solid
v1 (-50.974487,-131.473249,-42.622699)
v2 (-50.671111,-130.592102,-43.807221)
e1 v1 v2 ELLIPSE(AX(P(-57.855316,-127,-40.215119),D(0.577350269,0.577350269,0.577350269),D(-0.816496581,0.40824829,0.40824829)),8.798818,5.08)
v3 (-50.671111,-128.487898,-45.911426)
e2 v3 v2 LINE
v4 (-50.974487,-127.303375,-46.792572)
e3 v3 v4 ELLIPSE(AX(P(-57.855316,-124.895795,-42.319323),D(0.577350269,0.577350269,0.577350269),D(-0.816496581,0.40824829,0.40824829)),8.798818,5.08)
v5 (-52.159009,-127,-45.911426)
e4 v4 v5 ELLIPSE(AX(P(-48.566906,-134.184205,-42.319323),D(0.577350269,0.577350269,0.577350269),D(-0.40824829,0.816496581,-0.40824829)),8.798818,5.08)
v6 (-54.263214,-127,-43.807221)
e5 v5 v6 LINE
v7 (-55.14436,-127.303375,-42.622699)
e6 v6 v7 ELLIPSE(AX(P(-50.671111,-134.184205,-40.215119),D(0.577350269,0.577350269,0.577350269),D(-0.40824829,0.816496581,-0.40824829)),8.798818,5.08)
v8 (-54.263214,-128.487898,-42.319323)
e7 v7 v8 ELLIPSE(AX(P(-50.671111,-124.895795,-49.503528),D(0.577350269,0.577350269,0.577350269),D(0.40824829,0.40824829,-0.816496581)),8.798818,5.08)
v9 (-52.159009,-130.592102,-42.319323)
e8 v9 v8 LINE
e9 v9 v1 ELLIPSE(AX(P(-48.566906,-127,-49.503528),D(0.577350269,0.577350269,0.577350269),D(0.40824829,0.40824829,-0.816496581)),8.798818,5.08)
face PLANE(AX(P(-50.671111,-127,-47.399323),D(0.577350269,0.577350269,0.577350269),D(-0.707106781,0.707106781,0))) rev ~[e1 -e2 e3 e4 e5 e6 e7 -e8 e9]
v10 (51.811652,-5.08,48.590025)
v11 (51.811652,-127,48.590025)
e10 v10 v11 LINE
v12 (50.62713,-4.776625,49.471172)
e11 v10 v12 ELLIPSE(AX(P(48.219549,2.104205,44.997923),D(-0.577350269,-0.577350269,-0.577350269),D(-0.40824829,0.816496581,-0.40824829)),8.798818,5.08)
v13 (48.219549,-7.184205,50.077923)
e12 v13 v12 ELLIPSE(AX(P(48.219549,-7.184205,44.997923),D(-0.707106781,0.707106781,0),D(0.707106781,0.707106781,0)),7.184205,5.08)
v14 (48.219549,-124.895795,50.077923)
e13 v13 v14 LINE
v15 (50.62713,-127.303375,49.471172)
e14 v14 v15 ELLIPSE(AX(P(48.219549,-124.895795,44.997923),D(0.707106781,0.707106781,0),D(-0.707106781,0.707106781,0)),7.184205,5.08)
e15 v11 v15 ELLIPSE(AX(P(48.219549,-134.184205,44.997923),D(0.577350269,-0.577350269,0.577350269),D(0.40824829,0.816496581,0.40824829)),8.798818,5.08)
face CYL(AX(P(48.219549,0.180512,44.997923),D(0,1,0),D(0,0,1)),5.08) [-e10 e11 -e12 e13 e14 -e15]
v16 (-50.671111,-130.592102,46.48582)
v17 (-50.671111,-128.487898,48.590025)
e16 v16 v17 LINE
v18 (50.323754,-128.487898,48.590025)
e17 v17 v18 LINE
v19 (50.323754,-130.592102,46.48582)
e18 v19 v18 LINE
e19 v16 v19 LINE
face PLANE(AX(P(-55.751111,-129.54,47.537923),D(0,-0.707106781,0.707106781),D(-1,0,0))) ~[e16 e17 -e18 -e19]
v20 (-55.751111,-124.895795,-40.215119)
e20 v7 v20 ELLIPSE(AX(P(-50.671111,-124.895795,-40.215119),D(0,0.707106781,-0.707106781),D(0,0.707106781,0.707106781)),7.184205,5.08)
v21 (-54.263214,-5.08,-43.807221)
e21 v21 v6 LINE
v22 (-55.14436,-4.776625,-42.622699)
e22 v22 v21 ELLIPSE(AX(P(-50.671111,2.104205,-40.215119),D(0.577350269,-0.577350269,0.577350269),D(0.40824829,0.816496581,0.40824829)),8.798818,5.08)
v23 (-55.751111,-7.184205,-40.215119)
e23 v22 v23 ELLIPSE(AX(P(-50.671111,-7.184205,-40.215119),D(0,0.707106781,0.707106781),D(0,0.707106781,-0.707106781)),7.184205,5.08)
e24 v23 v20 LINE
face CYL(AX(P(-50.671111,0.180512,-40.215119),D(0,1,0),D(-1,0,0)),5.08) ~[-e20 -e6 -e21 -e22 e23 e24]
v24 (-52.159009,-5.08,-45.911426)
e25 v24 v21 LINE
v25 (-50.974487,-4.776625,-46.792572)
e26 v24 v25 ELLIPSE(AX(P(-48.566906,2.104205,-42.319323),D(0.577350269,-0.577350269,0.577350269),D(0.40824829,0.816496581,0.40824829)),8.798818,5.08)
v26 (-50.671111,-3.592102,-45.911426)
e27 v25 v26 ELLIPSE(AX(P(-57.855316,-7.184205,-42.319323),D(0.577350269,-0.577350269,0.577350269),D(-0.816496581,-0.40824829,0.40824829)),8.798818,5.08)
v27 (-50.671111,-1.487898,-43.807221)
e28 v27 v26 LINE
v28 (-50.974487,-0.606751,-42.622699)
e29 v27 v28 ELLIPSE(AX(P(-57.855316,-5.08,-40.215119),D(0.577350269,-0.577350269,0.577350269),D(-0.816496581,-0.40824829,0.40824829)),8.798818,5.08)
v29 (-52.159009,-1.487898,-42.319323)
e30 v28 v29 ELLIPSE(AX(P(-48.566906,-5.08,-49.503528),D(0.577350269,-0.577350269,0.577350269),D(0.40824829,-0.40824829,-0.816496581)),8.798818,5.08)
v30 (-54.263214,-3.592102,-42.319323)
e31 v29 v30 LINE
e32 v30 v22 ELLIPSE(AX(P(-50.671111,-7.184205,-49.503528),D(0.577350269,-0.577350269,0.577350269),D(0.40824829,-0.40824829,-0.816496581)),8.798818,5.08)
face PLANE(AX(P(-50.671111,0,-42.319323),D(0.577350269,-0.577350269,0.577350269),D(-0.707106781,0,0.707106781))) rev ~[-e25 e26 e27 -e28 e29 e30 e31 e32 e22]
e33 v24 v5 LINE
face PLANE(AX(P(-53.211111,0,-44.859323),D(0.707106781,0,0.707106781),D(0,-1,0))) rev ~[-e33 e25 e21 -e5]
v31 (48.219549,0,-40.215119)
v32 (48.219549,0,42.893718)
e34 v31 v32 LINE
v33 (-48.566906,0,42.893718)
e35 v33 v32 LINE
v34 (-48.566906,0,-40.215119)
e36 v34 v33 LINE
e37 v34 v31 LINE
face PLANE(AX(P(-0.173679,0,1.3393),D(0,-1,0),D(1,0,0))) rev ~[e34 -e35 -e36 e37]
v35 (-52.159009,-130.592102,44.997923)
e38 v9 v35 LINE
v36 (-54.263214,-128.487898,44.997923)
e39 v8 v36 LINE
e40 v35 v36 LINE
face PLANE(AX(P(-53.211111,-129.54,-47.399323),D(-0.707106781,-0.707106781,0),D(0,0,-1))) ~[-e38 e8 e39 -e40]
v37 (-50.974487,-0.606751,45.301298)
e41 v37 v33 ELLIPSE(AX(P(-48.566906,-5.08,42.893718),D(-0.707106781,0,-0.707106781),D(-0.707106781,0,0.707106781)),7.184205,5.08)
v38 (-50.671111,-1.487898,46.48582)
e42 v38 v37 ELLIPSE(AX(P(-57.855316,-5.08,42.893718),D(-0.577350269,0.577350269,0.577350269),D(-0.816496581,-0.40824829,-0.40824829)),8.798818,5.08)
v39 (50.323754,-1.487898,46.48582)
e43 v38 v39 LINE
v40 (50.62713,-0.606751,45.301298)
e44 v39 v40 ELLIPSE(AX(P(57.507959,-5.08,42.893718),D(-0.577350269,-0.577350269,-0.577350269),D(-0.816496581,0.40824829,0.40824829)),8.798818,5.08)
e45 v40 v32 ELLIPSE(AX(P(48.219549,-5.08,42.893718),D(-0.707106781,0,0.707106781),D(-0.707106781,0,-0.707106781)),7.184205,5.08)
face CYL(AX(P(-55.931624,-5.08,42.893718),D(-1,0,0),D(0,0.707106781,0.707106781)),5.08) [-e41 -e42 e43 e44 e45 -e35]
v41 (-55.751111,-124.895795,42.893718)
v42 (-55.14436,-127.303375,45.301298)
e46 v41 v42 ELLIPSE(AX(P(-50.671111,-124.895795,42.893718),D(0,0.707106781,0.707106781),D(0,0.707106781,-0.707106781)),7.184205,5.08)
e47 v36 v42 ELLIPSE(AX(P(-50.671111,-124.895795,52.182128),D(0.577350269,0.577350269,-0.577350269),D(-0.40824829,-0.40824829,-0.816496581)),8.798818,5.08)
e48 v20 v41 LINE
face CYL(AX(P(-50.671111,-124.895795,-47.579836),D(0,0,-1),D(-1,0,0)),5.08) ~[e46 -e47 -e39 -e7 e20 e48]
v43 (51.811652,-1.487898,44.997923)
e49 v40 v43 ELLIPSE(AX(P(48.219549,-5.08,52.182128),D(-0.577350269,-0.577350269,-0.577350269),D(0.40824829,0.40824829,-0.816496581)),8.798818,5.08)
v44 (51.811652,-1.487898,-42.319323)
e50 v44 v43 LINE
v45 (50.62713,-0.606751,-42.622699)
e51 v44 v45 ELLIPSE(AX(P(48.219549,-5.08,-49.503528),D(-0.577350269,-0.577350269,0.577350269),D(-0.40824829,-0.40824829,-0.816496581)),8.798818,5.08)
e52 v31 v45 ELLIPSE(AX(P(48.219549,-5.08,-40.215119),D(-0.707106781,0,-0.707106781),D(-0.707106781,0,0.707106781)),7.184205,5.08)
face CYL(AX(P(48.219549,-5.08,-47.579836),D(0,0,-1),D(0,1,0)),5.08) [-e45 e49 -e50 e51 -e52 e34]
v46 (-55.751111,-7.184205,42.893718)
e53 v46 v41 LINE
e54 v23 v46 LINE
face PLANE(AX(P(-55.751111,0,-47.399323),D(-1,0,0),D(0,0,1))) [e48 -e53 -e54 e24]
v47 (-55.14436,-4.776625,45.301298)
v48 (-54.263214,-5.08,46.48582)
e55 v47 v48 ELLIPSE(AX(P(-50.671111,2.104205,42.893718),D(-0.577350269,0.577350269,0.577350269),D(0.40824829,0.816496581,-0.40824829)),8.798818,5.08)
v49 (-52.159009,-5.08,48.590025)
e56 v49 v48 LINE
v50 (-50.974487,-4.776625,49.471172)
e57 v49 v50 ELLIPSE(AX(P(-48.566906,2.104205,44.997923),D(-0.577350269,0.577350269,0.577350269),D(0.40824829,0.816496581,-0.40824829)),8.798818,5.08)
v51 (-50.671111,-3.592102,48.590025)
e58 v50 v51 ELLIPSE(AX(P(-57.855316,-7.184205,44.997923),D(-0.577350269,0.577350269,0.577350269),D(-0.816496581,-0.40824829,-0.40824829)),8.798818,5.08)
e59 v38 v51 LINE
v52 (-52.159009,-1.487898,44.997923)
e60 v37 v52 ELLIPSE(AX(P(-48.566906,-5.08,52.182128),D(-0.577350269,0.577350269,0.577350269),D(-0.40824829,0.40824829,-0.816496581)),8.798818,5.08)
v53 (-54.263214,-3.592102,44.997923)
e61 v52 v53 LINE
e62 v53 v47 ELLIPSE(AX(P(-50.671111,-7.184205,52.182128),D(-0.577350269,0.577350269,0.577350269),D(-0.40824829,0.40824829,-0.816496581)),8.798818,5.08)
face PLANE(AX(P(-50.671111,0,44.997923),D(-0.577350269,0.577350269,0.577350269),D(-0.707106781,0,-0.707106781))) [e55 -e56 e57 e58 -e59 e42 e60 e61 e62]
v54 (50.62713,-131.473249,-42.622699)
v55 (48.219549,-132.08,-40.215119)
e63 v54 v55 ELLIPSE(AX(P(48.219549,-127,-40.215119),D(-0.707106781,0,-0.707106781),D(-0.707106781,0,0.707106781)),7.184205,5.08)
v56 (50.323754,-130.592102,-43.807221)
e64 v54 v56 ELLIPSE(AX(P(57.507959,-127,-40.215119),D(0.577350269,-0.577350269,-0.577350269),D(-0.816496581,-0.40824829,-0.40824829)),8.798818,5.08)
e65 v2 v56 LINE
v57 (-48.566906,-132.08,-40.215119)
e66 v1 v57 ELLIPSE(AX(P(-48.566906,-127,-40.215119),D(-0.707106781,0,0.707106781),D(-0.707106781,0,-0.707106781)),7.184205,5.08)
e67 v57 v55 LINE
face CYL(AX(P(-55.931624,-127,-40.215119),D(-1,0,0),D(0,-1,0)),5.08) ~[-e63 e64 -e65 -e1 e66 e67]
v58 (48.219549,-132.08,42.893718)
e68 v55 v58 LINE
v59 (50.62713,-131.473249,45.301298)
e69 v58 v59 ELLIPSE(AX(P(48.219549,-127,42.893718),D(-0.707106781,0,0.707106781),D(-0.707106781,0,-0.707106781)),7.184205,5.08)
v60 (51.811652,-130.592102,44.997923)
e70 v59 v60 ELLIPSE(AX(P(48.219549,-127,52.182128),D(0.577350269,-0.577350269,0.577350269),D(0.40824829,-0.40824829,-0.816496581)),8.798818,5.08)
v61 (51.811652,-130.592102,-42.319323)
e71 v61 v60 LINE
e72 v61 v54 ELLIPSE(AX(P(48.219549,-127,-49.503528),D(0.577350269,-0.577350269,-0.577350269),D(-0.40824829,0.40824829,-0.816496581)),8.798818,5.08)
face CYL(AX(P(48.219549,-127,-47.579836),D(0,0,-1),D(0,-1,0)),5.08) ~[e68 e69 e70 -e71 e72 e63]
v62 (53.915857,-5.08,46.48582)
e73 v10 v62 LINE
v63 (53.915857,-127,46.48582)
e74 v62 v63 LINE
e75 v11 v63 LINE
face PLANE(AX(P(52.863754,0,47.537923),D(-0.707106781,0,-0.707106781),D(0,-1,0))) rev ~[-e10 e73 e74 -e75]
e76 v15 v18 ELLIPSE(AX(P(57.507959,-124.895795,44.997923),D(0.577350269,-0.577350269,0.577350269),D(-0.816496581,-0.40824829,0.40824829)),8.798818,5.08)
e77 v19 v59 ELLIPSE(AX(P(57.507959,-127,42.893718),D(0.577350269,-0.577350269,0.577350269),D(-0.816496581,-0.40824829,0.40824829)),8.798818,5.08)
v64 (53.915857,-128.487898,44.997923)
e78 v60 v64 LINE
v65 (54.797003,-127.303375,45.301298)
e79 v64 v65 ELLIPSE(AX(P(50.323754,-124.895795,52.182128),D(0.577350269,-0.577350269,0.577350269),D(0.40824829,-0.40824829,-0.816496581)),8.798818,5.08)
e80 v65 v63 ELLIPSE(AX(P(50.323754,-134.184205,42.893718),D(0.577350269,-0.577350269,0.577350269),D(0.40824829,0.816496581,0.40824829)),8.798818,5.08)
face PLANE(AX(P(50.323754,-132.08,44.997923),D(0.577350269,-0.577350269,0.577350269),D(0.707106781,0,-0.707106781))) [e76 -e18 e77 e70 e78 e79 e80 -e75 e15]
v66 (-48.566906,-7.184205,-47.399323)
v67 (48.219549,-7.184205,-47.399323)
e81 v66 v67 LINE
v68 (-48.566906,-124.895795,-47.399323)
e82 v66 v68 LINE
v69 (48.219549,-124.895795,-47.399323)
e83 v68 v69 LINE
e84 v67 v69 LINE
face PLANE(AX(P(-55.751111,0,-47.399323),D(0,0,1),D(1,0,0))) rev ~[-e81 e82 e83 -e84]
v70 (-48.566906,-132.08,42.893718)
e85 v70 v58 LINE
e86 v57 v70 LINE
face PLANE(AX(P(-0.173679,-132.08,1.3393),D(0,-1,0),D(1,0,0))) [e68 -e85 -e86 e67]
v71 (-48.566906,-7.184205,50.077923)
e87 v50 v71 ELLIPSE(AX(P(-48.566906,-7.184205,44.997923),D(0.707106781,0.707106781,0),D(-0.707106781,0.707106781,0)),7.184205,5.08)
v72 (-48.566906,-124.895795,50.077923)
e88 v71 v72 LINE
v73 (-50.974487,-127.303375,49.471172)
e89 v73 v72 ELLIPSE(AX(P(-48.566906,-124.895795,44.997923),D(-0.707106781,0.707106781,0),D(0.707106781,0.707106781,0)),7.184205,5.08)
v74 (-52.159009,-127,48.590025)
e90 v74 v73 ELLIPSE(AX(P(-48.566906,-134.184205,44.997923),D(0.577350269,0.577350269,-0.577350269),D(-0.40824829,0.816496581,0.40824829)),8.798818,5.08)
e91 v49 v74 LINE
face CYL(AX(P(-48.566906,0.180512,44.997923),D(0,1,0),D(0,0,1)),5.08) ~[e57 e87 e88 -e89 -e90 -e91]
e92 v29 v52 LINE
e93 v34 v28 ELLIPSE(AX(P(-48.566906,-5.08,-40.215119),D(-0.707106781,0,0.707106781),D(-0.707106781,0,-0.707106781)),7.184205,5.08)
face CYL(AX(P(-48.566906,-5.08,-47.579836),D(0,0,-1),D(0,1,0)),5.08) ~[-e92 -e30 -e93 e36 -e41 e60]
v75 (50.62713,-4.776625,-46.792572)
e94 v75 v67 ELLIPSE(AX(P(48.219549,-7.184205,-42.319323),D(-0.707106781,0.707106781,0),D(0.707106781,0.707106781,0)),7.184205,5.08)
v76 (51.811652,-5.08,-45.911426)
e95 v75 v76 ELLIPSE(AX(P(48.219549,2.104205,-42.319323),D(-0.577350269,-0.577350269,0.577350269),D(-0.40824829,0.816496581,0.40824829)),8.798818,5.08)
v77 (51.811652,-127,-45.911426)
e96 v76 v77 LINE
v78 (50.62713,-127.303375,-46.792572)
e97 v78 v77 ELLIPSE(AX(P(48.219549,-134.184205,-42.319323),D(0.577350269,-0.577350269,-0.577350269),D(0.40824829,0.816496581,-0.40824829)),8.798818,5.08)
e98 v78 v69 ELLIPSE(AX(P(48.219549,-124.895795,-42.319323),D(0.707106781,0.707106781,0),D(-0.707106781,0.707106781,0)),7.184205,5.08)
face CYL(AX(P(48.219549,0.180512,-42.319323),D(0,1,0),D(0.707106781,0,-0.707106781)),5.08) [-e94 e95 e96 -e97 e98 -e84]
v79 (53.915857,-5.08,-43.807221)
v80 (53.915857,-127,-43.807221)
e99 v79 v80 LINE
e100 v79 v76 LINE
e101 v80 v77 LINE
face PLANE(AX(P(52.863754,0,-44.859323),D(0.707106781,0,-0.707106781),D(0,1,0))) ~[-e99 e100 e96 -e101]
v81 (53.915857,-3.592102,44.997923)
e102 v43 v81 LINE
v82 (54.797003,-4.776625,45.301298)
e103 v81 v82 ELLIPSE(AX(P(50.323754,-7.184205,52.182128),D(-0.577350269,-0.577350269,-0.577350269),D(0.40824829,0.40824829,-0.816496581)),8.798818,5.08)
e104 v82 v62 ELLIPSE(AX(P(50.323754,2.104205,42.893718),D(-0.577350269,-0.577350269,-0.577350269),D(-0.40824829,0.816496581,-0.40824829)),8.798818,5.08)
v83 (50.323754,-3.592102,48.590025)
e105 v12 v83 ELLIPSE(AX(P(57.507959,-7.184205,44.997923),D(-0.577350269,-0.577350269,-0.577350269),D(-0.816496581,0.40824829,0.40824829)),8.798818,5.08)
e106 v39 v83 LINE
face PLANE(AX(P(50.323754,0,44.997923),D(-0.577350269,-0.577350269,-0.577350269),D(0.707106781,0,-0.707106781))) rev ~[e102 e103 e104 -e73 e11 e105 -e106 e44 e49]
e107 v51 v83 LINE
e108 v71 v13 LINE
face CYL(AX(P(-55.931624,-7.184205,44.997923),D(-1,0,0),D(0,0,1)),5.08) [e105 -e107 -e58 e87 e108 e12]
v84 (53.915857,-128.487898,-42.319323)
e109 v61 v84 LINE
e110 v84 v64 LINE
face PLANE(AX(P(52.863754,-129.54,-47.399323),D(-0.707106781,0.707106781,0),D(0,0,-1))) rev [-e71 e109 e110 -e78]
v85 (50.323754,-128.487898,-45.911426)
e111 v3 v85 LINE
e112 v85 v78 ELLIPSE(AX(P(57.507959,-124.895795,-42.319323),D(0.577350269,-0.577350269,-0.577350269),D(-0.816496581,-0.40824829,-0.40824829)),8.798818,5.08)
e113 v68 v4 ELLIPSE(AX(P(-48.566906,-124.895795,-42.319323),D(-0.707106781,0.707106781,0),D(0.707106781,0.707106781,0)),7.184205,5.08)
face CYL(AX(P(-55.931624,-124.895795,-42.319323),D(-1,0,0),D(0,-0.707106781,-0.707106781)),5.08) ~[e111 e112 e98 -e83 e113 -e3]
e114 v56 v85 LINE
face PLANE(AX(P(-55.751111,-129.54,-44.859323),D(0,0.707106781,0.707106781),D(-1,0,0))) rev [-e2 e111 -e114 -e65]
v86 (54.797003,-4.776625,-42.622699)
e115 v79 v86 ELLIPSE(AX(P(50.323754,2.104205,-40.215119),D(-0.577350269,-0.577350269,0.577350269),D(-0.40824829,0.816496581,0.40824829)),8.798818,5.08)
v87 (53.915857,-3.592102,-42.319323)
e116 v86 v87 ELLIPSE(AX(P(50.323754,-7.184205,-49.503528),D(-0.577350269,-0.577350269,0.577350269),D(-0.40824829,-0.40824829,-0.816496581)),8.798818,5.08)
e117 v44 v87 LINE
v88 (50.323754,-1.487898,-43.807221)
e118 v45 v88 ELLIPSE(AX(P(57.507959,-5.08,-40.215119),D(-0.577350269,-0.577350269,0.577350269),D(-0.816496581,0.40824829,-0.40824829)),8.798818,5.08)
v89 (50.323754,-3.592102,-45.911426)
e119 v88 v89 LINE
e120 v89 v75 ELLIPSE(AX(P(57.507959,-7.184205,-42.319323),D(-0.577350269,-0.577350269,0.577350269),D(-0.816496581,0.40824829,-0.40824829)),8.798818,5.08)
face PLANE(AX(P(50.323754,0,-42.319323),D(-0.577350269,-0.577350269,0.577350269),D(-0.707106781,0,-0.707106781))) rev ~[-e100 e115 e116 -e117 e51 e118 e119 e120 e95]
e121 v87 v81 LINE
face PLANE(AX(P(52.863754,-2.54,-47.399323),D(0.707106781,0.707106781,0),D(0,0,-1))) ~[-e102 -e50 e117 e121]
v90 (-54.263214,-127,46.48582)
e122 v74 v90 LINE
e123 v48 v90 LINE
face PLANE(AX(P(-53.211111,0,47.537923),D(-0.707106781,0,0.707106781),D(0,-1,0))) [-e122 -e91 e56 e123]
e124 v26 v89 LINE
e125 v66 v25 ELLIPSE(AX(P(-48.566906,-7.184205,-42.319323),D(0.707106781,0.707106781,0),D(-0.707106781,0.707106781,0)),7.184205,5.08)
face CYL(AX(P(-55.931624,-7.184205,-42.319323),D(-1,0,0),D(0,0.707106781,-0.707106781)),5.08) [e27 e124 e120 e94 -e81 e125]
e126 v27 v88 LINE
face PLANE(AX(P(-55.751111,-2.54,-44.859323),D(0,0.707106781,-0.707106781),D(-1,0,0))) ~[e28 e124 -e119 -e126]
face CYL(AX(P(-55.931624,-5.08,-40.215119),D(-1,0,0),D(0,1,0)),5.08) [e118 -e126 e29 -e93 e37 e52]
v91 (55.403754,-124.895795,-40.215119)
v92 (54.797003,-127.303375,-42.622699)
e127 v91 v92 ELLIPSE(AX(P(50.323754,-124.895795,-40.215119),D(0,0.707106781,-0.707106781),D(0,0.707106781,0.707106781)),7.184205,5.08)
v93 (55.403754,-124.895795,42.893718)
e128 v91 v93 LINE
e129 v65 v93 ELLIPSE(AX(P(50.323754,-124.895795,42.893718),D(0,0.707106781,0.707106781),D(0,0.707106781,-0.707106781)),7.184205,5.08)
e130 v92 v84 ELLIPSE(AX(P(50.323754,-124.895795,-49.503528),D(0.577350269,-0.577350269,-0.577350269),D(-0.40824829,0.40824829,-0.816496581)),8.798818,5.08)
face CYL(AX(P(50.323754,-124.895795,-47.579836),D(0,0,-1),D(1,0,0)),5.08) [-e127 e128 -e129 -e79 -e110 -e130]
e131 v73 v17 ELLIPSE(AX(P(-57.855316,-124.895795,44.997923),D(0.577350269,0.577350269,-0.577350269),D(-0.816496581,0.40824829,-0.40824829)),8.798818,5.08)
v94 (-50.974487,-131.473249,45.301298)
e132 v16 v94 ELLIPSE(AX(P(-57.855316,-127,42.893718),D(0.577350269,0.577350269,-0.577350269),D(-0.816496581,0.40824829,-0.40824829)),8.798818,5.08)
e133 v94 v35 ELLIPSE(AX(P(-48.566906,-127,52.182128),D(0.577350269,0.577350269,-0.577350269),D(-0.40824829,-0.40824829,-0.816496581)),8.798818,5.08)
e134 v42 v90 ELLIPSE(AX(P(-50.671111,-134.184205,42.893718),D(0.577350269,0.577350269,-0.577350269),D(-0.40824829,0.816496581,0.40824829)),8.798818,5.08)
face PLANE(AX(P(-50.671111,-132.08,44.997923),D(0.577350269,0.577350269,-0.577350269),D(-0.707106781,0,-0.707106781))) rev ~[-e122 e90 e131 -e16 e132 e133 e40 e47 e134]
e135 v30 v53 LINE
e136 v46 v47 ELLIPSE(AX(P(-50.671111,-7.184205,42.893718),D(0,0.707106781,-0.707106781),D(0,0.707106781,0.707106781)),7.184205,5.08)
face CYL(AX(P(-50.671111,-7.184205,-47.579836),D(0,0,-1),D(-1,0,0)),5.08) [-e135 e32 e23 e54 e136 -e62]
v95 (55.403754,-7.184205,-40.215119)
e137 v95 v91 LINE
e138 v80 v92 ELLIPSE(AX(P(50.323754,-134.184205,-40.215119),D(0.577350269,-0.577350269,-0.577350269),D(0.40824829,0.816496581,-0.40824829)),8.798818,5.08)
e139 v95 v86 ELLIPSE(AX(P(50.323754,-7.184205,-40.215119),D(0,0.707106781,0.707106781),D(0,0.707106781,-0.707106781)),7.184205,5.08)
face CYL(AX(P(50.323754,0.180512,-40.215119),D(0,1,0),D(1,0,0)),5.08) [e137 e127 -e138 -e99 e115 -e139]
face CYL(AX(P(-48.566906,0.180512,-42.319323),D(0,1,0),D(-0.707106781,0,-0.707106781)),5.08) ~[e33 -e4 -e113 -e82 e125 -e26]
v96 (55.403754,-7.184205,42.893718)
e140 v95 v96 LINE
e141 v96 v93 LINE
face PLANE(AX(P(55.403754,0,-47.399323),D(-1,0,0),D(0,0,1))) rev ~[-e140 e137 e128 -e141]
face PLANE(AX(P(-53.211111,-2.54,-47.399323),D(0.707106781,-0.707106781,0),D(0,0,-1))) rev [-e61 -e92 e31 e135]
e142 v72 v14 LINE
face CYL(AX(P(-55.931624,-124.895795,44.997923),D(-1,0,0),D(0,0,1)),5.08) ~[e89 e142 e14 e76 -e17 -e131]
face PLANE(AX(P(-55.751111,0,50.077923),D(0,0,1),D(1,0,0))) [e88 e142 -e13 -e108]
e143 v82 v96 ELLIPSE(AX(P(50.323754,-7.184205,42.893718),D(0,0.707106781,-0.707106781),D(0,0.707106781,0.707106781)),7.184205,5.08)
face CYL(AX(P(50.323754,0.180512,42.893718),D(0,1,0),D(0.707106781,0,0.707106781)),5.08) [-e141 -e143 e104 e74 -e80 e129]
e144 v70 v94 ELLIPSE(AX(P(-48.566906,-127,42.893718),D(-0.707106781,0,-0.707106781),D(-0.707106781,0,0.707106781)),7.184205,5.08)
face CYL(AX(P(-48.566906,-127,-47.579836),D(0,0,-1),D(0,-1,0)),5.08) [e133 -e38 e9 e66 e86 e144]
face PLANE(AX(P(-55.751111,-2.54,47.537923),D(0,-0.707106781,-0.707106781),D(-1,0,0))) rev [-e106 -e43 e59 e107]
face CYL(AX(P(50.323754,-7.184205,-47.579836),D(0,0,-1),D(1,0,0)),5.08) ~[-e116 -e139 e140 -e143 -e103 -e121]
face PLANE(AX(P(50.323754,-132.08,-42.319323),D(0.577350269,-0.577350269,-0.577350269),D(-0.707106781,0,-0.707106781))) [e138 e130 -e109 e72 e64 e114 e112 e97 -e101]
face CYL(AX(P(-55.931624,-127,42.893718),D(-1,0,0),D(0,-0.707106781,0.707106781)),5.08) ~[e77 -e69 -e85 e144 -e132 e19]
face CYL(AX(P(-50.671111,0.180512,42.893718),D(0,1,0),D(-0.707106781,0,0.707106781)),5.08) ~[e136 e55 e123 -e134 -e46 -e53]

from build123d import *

# Parameters (mm, degrees)
F0_W        = 111.1548654735
F0_H        = 97.4772460759
F1_DEPTH    = 132.08
F2_SIZE     = 5.08
F3_T1_DEPTH = 132.4410244843
F3_T3_DEPTH = 111.5158899578
F3_T5_DEPTH = 97.8382705601


# Not quite as in the source:
# - a fillet or chamfer that OpenCascade refuses, or shapes differently, is made with other operations: its cross-section is extruded or revolved along the edge and cut away or added


with BuildPart() as f1:
    # F0 (on Front) → F1 (new body)
    with BuildSketch(Plane.XZ):
        with Locations((-0.1736786216, 1.3392996043)):
            Rectangle(F0_W, F0_H)
    extrude(amount=F1_DEPTH)

    # F2
    f2_edges = [f1.edges().sort_by_distance(p)[0] for p in [
        (55.403754, -66.04, 50.077923),
        (-55.751111, -66.04, 50.077923),
        (-0.173679, 0, 50.077923),
        (-0.173679, -132.08, 50.077923),
        (55.403754, -66.04, -47.399323),
        (55.403754, 0, 1.3393),
        (55.403754, -132.08, 1.3393),
        (-55.751111, -132.08, 1.3393),
        (-0.173679, -132.08, -47.399323),
        (-55.751111, -66.04, -47.399323),
        (-0.173679, 0, -47.399323),
        (-55.751111, 0, 1.3393),
    ]]
    chamfer(f2_edges, length=F2_SIZE)

    # F3: fillet of radius 5.08 on 24 edges, made by hand

    # F3_s2 → F3_t1 (cut)
    with BuildSketch(Plane.XZ.offset(-0.1805122421)):
        with BuildLine():
            ThreePointArc((48.2195492182, 50.0779226422), (50.1635810547, 49.6912306674), (51.8116516667, 48.5900250907))
            Line((51.8116516667, 48.5900250907), (50.3237541151, 50.0779226422))
            Line((50.3237541151, 50.0779226422), (48.2195492182, 50.0779226422))
        make_face()
        with BuildLine():
            ThreePointArc((-48.5669064615, 50.0779226422), (-50.510938298, 49.6912306674), (-52.15900891, 48.5900250907))
            Line((-52.15900891, 48.5900250907), (-50.6711113584, 50.0779226422))
            Line((-50.6711113584, 50.0779226422), (-48.5669064615, 50.0779226422))
        make_face()
        with BuildLine():
            ThreePointArc((53.9158565635, 46.4858201938), (55.0170621403, 44.8377495818), (55.4037541151, 42.8937177454))
            Line((55.4037541151, 42.8937177454), (55.4037541151, 44.9979226422))
            Line((55.4037541151, 44.9979226422), (53.9158565635, 46.4858201938))
        make_face()
        with BuildLine():
            ThreePointArc((55.4037541151, -40.2151185368), (55.0170621403, -42.1591503732), (53.9158565635, -43.8072209852))
            Line((53.9158565635, -43.8072209852), (55.4037541151, -42.3193234336))
            Line((55.4037541151, -42.3193234336), (55.4037541151, -40.2151185368))
        make_face()
        with BuildLine():
            ThreePointArc((51.8116516667, -45.9114258821), (50.1635810547, -47.0126314588), (48.2195492182, -47.3993234336))
            Line((48.2195492182, -47.3993234336), (50.3237541151, -47.3993234336))
            Line((50.3237541151, -47.3993234336), (51.8116516667, -45.9114258821))
        make_face()
        with BuildLine():
            ThreePointArc((-52.15900891, -45.9114258821), (-50.510938298, -47.0126314588), (-48.5669064615, -47.3993234336))
            Line((-48.5669064615, -47.3993234336), (-50.6711113584, -47.3993234336))
            Line((-50.6711113584, -47.3993234336), (-52.15900891, -45.9114258821))
        make_face()
        with BuildLine():
            ThreePointArc((-54.2632138068, 46.4858201938), (-55.3644193836, 44.8377495818), (-55.7511113584, 42.8937177454))
            Line((-55.7511113584, 42.8937177454), (-55.7511113584, 44.9979226422))
            Line((-55.7511113584, 44.9979226422), (-54.2632138068, 46.4858201938))
        make_face()
        with BuildLine():
            ThreePointArc((-55.7511113584, -40.2151185368), (-55.3644193836, -42.1591503732), (-54.2632138068, -43.8072209852))
            Line((-54.2632138068, -43.8072209852), (-55.7511113584, -42.3193234336))
            Line((-55.7511113584, -42.3193234336), (-55.7511113584, -40.2151185368))
        make_face()
    extrude(amount=F3_T1_DEPTH, mode=Mode.SUBTRACT)

    # F3_s4 → F3_t3 (cut)
    with BuildSketch(Plane.YZ.offset(-55.9316236005)):
        with BuildLine():
            ThreePointArc((-7.1842048969, 50.0779226422), (-5.2401730604, 49.6912306674), (-3.5921024484, 48.5900250907))
            Line((-3.5921024484, 48.5900250907), (-5.08, 50.0779226422))
            Line((-5.08, 50.0779226422), (-7.1842048969, 50.0779226422))
        make_face()
        with BuildLine():
            ThreePointArc((-124.8957951031, 50.0779226422), (-126.8398269396, 49.6912306674), (-128.4878975516, 48.5900250907))
            Line((-128.4878975516, 48.5900250907), (-127, 50.0779226422))
            Line((-127, 50.0779226422), (-124.8957951031, 50.0779226422))
        make_face()
        with BuildLine():
            ThreePointArc((-1.4878975516, 46.4858201938), (-0.3866919748, 44.8377495818), (0, 42.8937177454))
            Line((0, 42.8937177454), (0, 44.9979226422))
            Line((0, 44.9979226422), (-1.4878975516, 46.4858201938))
        make_face()
        with BuildLine():
            ThreePointArc((0, -40.2151185368), (-0.3866919748, -42.1591503732), (-1.4878975516, -43.8072209852))
            Line((-1.4878975516, -43.8072209852), (0, -42.3193234336))
            Line((0, -42.3193234336), (0, -40.2151185368))
        make_face()
        with BuildLine():
            ThreePointArc((-3.5921024484, -45.9114258821), (-5.2401730604, -47.0126314588), (-7.1842048969, -47.3993234336))
            Line((-7.1842048969, -47.3993234336), (-5.08, -47.3993234336))
            Line((-5.08, -47.3993234336), (-3.5921024484, -45.9114258821))
        make_face()
        with BuildLine():
            ThreePointArc((-128.4878975516, -45.9114258821), (-126.8398269396, -47.0126314588), (-124.8957951031, -47.3993234336))
            Line((-124.8957951031, -47.3993234336), (-127, -47.3993234336))
            Line((-127, -47.3993234336), (-128.4878975516, -45.9114258821))
        make_face()
        with BuildLine():
            ThreePointArc((-130.5921024484, 46.4858201938), (-131.6933080252, 44.8377495818), (-132.08, 42.8937177454))
            Line((-132.08, 42.8937177454), (-132.08, 44.9979226422))
            Line((-132.08, 44.9979226422), (-130.5921024484, 46.4858201938))
        make_face()
        with BuildLine():
            ThreePointArc((-132.08, -40.2151185368), (-131.6933080252, -42.1591503732), (-130.5921024484, -43.8072209852))
            Line((-130.5921024484, -43.8072209852), (-132.08, -42.3193234336))
            Line((-132.08, -42.3193234336), (-132.08, -40.2151185368))
        make_face()
    extrude(amount=F3_T3_DEPTH, mode=Mode.SUBTRACT)

    # F3_s6 → F3_t5 (cut)
    with BuildSketch(Plane.XY.offset(-47.5798356758)):
        with BuildLine():
            ThreePointArc((48.2195492182, 0), (50.1635810547, -0.3866919748), (51.8116516667, -1.4878975516))
            Line((51.8116516667, -1.4878975516), (50.3237541151, 0))
            Line((50.3237541151, 0), (48.2195492182, 0))
        make_face()
        with BuildLine():
            ThreePointArc((-48.5669064615, 0), (-50.510938298, -0.3866919748), (-52.15900891, -1.4878975516))
            Line((-52.15900891, -1.4878975516), (-50.6711113584, 0))
            Line((-50.6711113584, 0), (-48.5669064615, 0))
        make_face()
        with BuildLine():
            ThreePointArc((55.4037541151, -7.1842048969), (55.0170621403, -5.2401730604), (53.9158565635, -3.5921024484))
            Line((53.9158565635, -3.5921024484), (55.4037541151, -5.08))
            Line((55.4037541151, -5.08), (55.4037541151, -7.1842048969))
        make_face()
        with BuildLine():
            ThreePointArc((55.4037541151, -124.8957951031), (55.0170621403, -126.8398269396), (53.9158565635, -128.4878975516))
            Line((53.9158565635, -128.4878975516), (55.4037541151, -127))
            Line((55.4037541151, -127), (55.4037541151, -124.8957951031))
        make_face()
        with BuildLine():
            ThreePointArc((-55.7511113584, -7.1842048969), (-55.3644193836, -5.2401730604), (-54.2632138068, -3.5921024484))
            Line((-54.2632138068, -3.5921024484), (-55.7511113584, -5.08))
            Line((-55.7511113584, -5.08), (-55.7511113584, -7.1842048969))
        make_face()
        with BuildLine():
            ThreePointArc((-55.7511113584, -124.8957951031), (-55.3644193836, -126.8398269396), (-54.2632138068, -128.4878975516))
            Line((-54.2632138068, -128.4878975516), (-55.7511113584, -127))
            Line((-55.7511113584, -127), (-55.7511113584, -124.8957951031))
        make_face()
        with BuildLine():
            ThreePointArc((48.2195492182, -132.08), (50.1635810547, -131.6933080252), (51.8116516667, -130.5921024484))
            Line((51.8116516667, -130.5921024484), (50.3237541151, -132.08))
            Line((50.3237541151, -132.08), (48.2195492182, -132.08))
        make_face()
        with BuildLine():
            ThreePointArc((-48.5669064615, -132.08), (-50.510938298, -131.6933080252), (-52.15900891, -130.5921024484))
            Line((-52.15900891, -130.5921024484), (-50.6711113584, -132.08))
            Line((-50.6711113584, -132.08), (-48.5669064615, -132.08))
        make_face()
    extrude(amount=F3_T5_DEPTH, mode=Mode.SUBTRACT)


solid = f1.part
